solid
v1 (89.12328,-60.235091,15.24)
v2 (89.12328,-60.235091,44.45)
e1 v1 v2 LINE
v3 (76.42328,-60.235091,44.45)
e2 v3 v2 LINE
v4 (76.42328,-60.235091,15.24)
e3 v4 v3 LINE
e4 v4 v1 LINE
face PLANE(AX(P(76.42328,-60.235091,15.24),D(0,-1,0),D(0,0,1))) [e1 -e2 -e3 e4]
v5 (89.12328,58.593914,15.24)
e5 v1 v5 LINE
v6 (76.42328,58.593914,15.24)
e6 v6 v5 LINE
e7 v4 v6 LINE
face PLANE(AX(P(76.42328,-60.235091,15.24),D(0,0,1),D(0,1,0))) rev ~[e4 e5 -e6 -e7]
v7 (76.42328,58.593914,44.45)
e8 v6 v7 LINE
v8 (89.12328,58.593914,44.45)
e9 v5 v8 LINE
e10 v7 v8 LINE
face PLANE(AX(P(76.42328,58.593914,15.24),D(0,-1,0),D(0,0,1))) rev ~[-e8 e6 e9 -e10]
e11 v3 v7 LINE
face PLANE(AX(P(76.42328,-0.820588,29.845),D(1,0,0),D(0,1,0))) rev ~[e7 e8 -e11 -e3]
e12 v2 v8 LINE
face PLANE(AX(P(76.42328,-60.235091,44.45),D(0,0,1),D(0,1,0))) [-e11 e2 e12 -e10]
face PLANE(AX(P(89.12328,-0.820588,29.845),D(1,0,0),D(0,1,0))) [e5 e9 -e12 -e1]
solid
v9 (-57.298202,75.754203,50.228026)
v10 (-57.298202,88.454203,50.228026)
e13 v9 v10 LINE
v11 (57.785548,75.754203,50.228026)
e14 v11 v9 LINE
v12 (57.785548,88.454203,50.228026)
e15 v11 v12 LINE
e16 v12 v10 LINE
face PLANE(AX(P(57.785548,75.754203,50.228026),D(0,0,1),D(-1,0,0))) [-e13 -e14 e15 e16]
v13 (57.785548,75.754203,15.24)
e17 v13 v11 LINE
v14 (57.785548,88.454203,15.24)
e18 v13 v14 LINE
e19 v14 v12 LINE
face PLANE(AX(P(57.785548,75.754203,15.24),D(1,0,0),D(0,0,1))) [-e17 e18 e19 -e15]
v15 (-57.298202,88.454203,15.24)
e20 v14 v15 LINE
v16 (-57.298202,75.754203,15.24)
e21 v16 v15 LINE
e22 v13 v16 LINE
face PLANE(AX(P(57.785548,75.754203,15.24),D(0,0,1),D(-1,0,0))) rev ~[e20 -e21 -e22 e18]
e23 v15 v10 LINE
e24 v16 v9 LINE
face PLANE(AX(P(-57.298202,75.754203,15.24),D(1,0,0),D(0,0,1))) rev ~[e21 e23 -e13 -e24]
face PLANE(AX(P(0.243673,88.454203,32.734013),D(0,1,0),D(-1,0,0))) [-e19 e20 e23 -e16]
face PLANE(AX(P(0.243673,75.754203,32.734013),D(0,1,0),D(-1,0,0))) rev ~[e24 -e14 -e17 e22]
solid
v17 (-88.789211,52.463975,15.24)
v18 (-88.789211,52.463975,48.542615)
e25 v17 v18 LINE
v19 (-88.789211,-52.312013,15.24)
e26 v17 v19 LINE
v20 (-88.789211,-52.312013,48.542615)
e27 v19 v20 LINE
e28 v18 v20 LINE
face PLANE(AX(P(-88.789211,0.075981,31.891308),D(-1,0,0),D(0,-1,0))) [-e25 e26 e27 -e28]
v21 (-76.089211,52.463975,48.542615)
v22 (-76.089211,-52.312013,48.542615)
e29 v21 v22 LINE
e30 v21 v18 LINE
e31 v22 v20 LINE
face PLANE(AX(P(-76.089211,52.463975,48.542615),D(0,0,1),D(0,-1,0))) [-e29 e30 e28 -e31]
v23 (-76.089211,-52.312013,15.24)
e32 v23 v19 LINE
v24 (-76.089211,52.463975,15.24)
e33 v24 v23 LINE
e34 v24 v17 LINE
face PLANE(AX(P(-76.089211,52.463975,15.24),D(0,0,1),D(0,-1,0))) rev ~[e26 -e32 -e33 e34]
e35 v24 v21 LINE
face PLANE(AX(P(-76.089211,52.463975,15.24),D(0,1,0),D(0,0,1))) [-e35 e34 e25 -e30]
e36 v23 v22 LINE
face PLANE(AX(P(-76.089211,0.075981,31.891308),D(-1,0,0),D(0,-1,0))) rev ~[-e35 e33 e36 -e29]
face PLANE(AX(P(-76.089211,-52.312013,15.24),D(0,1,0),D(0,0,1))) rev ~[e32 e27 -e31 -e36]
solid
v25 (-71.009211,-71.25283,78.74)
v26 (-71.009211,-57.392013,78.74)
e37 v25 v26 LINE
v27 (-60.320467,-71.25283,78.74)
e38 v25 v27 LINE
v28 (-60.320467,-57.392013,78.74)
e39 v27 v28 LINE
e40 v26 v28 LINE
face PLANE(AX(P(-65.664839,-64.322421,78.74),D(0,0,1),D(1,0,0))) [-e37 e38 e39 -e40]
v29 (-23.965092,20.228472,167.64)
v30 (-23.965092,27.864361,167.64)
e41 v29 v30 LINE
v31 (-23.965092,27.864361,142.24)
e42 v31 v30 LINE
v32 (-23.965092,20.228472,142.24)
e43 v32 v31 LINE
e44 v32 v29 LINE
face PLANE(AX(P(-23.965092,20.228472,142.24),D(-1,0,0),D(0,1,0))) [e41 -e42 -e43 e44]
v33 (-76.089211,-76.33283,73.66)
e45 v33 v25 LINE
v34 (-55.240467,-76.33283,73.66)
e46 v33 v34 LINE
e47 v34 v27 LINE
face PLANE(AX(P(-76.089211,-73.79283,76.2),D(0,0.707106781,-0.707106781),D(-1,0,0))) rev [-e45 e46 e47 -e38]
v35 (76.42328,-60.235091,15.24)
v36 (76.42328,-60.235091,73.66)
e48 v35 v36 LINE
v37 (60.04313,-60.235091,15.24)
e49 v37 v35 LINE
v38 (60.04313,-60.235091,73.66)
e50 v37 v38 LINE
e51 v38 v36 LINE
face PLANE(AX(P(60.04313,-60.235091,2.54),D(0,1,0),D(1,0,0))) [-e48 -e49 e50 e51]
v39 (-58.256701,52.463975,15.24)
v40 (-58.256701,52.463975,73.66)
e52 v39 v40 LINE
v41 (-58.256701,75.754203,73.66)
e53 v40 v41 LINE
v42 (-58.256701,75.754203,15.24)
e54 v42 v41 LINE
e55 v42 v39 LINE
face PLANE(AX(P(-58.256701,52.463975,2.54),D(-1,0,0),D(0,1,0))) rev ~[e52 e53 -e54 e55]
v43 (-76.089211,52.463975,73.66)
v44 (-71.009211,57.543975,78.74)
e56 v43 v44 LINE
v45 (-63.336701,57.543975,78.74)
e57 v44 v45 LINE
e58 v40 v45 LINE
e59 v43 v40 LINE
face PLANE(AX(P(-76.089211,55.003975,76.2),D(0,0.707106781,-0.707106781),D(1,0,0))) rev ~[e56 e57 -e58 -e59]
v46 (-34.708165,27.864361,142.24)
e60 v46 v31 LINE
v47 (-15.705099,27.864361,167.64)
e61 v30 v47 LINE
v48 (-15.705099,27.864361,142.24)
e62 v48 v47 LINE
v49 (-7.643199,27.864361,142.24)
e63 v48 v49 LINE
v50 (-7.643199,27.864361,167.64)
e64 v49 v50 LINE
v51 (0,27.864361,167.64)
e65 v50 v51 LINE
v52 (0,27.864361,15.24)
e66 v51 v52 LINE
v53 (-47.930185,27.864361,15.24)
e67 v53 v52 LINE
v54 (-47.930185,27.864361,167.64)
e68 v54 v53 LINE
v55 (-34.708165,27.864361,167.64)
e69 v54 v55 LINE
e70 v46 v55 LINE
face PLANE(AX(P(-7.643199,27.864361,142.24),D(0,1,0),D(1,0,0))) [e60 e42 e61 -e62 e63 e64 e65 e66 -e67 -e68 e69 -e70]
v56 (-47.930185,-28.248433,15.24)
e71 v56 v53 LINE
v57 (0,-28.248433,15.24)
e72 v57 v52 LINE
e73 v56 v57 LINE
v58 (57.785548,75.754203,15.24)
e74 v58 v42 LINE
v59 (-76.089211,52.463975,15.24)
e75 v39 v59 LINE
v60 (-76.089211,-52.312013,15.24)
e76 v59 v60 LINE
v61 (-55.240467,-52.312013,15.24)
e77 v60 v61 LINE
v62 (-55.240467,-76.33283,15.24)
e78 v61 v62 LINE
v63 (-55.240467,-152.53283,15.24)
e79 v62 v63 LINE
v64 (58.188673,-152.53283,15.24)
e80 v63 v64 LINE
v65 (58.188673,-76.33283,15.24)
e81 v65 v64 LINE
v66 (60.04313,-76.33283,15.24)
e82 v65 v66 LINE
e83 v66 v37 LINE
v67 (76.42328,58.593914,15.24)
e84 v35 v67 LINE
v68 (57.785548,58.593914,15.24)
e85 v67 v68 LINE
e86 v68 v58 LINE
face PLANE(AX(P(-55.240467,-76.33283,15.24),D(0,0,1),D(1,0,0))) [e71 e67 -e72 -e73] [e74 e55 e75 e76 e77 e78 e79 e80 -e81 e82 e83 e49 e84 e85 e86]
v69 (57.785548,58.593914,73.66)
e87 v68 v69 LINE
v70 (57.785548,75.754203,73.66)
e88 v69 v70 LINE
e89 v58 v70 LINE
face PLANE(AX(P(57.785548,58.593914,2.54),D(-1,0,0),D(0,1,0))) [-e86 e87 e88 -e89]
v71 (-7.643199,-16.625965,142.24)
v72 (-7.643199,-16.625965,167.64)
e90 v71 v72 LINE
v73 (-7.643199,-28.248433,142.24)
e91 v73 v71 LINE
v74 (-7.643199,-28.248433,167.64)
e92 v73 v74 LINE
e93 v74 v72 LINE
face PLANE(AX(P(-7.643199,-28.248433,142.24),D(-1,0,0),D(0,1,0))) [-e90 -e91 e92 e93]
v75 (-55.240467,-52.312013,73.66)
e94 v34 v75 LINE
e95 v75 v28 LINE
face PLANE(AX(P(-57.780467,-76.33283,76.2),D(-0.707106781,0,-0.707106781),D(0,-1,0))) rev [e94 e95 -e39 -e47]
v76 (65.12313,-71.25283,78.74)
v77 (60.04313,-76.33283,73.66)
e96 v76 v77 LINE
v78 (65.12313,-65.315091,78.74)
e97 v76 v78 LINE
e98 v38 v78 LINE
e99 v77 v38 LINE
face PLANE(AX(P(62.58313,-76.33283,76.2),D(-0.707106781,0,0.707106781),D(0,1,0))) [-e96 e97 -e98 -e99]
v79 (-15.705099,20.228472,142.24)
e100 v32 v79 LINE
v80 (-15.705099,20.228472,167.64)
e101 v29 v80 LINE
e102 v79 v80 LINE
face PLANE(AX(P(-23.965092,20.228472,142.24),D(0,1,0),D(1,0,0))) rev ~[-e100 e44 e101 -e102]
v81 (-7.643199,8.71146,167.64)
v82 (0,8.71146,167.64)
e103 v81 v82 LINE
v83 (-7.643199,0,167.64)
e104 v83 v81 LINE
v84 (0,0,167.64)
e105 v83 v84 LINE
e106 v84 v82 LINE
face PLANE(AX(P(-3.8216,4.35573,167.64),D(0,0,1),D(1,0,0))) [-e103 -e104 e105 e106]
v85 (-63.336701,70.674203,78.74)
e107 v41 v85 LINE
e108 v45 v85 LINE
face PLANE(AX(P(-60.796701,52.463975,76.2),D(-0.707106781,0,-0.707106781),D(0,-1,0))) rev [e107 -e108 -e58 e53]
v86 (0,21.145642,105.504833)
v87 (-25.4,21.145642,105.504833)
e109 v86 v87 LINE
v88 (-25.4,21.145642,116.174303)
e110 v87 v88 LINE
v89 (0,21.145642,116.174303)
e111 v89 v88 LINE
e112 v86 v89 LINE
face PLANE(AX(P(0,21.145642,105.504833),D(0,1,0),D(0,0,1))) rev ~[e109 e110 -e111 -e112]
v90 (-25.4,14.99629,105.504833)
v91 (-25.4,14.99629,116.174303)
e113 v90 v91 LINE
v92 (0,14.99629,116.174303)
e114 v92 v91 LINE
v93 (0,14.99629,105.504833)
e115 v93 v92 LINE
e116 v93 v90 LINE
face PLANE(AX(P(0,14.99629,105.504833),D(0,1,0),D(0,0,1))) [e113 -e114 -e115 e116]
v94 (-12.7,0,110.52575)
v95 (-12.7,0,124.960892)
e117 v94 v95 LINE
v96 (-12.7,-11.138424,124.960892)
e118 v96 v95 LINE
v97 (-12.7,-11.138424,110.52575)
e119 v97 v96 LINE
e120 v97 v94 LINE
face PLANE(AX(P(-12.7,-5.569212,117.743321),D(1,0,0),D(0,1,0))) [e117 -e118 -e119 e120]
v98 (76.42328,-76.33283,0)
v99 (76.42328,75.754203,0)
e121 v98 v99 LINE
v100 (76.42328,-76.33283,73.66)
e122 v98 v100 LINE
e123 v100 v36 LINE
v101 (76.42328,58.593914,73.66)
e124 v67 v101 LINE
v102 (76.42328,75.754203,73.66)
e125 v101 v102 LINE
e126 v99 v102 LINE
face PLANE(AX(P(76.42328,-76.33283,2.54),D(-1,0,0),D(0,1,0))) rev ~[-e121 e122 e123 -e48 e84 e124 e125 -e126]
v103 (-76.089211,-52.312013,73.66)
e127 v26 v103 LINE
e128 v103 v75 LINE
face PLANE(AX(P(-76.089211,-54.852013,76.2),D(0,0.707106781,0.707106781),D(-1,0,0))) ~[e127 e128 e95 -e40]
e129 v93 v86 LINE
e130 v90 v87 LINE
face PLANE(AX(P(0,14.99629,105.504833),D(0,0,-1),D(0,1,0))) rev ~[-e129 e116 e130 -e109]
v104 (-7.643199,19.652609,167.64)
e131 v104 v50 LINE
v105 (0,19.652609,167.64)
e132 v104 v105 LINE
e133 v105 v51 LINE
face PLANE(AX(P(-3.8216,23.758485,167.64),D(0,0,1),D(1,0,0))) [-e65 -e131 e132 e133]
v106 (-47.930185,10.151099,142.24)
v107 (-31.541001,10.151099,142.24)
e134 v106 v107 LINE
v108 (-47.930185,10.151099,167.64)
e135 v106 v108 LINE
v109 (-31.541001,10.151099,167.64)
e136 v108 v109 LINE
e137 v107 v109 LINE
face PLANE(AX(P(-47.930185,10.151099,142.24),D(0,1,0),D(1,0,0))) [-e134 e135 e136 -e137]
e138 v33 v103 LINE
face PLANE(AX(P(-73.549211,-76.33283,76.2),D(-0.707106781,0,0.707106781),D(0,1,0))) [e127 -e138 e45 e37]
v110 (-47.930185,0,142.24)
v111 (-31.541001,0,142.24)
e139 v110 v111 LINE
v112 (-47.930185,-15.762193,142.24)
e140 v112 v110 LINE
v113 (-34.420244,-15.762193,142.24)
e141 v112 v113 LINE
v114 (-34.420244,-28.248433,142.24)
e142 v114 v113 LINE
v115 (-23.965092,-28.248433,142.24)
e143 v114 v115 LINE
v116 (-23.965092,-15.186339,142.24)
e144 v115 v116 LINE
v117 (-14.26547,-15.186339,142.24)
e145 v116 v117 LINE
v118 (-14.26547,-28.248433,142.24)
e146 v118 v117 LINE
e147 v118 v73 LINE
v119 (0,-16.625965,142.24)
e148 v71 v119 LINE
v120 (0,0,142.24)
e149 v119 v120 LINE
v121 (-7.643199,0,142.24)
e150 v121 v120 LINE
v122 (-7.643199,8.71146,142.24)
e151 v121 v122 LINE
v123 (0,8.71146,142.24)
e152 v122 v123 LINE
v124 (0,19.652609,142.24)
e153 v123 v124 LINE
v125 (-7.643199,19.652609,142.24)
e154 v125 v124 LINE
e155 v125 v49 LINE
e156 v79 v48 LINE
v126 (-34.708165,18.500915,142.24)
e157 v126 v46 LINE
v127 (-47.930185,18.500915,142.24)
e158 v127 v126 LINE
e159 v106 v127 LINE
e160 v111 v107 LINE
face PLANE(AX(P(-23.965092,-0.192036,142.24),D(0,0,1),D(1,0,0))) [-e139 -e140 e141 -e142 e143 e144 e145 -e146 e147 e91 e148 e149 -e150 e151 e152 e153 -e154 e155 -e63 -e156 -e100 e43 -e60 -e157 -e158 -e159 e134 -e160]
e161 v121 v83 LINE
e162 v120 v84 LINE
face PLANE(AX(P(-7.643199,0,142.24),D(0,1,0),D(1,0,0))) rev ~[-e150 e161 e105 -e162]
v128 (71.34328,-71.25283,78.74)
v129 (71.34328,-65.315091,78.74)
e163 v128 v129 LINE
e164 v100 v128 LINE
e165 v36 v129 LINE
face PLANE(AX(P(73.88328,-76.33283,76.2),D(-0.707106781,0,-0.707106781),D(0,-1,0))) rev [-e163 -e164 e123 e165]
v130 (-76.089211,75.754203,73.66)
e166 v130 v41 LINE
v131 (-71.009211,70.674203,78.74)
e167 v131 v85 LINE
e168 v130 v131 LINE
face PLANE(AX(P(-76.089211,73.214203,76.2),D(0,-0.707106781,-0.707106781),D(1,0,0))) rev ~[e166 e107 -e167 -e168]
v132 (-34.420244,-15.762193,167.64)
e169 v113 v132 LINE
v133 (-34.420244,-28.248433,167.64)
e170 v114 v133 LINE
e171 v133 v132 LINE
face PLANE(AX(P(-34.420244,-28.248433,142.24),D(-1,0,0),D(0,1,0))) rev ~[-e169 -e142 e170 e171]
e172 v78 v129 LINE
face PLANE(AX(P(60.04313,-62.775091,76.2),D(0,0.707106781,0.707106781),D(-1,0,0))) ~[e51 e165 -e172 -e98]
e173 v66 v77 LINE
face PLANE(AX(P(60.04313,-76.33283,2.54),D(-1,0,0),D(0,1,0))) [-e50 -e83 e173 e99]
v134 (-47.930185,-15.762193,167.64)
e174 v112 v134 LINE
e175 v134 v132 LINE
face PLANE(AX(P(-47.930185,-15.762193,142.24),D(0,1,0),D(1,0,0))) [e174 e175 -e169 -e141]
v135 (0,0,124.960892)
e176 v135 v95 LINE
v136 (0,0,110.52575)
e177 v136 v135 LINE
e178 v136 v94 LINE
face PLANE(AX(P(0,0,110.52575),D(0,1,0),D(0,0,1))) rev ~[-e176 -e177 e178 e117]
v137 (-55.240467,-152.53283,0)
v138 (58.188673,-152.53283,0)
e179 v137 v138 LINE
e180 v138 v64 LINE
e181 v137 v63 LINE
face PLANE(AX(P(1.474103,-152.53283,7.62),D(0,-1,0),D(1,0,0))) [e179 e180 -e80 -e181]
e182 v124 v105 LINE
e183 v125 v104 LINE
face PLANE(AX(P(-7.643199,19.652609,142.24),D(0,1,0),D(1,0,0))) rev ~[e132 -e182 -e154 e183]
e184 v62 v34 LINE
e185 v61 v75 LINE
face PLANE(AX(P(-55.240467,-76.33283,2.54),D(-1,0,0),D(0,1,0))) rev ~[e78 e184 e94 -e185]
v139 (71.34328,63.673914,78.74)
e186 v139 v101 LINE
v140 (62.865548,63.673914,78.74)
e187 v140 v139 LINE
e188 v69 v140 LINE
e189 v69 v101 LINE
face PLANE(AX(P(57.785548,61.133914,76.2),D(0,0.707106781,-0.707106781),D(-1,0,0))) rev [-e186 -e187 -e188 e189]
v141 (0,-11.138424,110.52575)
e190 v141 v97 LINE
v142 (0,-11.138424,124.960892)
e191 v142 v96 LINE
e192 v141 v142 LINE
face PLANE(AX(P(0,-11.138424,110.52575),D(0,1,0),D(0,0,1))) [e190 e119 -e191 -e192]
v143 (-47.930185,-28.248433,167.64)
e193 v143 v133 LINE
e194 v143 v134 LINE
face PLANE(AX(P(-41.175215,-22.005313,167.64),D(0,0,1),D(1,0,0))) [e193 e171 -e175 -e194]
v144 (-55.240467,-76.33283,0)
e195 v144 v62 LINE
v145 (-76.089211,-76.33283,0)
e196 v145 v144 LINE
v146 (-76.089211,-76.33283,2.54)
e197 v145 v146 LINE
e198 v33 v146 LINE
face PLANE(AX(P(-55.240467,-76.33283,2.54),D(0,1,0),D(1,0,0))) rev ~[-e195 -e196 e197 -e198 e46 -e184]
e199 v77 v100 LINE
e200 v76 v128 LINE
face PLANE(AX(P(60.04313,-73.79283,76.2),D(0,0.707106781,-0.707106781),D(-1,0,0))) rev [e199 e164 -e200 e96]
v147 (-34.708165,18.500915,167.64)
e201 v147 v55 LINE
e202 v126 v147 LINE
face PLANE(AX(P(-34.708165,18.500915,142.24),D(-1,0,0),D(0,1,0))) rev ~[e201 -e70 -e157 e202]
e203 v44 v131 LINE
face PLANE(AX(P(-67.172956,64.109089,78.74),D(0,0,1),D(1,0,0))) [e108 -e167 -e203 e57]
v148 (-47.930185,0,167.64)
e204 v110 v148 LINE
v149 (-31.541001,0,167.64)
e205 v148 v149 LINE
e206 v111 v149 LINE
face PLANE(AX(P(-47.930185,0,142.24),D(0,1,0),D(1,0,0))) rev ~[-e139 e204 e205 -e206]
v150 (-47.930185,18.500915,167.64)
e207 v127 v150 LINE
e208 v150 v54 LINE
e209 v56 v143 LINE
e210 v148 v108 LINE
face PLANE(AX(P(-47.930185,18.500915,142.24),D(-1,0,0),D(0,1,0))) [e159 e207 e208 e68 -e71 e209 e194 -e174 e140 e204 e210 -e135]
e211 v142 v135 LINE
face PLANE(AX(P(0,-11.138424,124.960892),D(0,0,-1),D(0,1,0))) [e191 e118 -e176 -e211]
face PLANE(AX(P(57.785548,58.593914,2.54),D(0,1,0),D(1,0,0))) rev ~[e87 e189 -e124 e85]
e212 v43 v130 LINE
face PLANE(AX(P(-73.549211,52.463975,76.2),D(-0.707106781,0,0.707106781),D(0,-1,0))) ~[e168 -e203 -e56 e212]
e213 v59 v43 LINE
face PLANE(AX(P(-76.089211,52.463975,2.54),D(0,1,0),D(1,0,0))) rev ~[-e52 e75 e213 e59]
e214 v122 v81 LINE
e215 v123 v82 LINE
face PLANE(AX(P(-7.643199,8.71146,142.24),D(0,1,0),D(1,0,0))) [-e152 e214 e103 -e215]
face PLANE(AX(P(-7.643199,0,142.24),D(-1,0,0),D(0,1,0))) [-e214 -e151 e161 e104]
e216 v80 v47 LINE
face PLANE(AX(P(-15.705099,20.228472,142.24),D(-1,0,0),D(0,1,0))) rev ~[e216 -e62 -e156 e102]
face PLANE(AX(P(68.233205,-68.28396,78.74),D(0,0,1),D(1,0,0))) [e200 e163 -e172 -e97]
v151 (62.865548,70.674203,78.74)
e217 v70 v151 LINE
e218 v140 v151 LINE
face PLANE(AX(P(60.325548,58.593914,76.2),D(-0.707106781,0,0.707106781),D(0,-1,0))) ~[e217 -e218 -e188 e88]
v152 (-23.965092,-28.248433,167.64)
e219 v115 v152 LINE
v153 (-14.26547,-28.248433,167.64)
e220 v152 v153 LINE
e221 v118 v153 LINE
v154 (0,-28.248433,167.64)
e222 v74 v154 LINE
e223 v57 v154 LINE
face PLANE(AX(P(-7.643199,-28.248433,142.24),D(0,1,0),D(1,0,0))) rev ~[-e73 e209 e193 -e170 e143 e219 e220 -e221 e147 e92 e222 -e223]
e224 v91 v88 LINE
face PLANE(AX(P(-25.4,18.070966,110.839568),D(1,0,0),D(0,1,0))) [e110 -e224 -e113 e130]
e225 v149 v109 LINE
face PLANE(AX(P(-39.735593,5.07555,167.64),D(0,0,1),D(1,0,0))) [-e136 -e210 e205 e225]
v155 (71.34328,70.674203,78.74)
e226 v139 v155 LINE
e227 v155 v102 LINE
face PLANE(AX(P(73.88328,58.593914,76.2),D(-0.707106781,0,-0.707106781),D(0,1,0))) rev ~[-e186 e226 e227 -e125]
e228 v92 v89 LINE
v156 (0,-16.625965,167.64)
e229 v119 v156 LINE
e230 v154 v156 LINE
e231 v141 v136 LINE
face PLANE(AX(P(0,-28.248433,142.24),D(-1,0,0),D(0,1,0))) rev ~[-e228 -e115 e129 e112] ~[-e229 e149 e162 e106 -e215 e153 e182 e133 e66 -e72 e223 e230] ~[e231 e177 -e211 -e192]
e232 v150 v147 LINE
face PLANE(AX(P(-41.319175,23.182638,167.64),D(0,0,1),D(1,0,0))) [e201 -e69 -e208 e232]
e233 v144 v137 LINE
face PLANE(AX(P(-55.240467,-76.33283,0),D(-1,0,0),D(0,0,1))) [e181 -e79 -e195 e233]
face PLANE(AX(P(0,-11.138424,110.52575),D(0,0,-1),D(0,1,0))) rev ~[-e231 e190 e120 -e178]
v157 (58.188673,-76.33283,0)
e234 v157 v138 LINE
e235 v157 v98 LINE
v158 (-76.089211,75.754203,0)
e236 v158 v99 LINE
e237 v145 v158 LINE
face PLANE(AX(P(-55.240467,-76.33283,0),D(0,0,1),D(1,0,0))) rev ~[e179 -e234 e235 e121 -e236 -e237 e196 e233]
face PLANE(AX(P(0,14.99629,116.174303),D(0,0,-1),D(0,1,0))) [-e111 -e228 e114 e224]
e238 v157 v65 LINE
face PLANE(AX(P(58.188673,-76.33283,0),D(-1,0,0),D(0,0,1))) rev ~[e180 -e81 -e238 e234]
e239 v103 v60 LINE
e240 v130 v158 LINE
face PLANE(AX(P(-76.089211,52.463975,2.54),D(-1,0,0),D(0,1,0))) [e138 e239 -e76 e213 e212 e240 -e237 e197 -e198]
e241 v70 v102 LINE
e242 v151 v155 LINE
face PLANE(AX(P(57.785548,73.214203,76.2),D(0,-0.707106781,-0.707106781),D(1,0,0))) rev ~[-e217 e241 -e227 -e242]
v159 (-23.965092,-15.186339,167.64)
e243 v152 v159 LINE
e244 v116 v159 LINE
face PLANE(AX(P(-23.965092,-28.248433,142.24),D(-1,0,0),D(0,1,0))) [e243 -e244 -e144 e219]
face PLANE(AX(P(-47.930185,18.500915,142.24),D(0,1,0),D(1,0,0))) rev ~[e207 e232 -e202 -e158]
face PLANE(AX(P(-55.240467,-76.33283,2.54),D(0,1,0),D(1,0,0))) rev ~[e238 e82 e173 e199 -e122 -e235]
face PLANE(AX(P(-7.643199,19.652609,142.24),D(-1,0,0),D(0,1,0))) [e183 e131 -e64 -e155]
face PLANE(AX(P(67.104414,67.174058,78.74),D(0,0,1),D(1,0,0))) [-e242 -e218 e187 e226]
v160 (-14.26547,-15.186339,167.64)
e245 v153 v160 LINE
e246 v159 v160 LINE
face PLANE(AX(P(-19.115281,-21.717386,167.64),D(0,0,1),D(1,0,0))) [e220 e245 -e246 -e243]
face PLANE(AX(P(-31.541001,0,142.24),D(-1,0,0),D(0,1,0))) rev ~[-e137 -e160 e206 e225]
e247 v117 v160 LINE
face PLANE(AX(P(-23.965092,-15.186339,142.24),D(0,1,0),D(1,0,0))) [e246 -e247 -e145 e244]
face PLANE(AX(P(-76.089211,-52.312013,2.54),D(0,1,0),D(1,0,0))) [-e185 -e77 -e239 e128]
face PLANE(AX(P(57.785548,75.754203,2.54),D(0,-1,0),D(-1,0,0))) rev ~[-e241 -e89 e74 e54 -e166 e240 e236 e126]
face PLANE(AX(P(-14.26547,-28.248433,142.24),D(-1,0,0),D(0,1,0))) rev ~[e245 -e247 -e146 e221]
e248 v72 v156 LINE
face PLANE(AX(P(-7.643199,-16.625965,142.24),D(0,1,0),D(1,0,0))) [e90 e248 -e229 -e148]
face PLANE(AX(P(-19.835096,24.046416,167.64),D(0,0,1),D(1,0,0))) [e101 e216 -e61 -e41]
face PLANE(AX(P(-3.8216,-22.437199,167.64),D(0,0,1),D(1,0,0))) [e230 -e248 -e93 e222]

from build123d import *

# Parameters (mm, degrees)
F0_W      = 152.5124907494
F0_H      = 152.087032795
F1_DEPTH  = 2.54
F2_W      = 20.8487436175
F2_H      = 24.0208171308
F3_DEPTH  = 76.2
F2_W_2    = 17.8325101733
F2_H_2    = 23.2902280986
F4_DEPTH  = 76.2
F2_W_3    = 16.3801498711
F2_H_3    = 16.0977393389
F2_W_4    = 18.6377316713
F2_H_4    = 17.1602889895
F5_DEPTH  = 76.2
F6_DEPTH  = 12.7
F6_FACE_W = 20.8487436175
F6_FACE_H = 24.0208171308
F7_DEPTH  = 12.7
F8_SIZE   = 5.08
F12_W     = 118.8290044665
F12_H     = 29.21
F13_DEPTH = 12.7
F15_W     = 115.0837503374
F15_H     = 34.9880257642
F16_DEPTH = 12.7
F17_W     = 104.7759875655
F17_H     = 33.3026150262
F18_DEPTH = 12.7
F19_W     = 113.4291402996
F19_H     = 15.24
F20_DEPTH = 76.2
F22_W     = 47.9301847517
F22_H     = 56.1127942055
F23_DEPTH = 127
F24_W     = 13.509940356
F24_H     = 12.4862398952
F25_DEPTH = 25.4
F24_W_2   = 16.3891837001
F24_H_2   = 10.1510994136
F26_DEPTH = 25.4
F24_W_3   = 13.2220201194
F24_H_3   = 9.3634463847
F27_DEPTH = 25.4
F24_W_4   = 8.2599930465
F24_H_4   = 7.6358895749
F28_DEPTH = 25.4
F24_W_5   = 7.6431990601
F24_H_5   = 8.2117523998
F29_DEPTH = 25.4
F24_H_6   = 8.7114600465
F30_DEPTH = 25.4
F24_H_7   = 11.6224680096
F31_DEPTH = 25.4
F24_W_6   = 9.6996221691
F24_H_8   = 13.0620943382
F32_DEPTH = 25.4
F33_W     = 11.1384242773
F33_H     = 14.4351422787
F34_DEPTH = 12.7
F33_W_2   = 6.1493515968
F33_H_2   = 10.6694698334
F35_DEPTH = 25.4


# Not quite as in the source:
# - two fillets or chamfers of one size are made in one step
# - the program builds the solid bodies; features that only make, move or delete a surface that nothing else refers to are left out


with BuildPart() as f1:
    # F0 (on Top) → F1 (new body)
    with BuildSketch(Plane.XY):
        with Locations((0.1670345664, -0.2893134952)):
            Rectangle(F0_W, F0_H)
    extrude(amount=F1_DEPTH)

    # F2 (on face) → F3 (join)
    with BuildSketch(Plane.XY.offset(2.54)):
        with Locations((-65.6648389995, -64.3224213272)):
            Rectangle(F2_W, F2_H)
    extrude(amount=F3_DEPTH)

    # F2 (on face) → F4 (join)
    with BuildSketch(Plane.XY.offset(2.54)):
        with Locations((-67.1729557216, 64.109088853)):
            Rectangle(F2_W_2, F2_H_2)
    extrude(amount=F4_DEPTH)

    # F2 (on face) → F5 (join)
    with BuildSketch(Plane.XY.offset(2.54)):
        with Locations((68.2332050055, -68.2839602232)):
            Rectangle(F2_W_3, F2_H_3)
        with Locations((67.1044141054, 67.1740584075)):
            Rectangle(F2_W_4, F2_H_4)
    extrude(amount=F5_DEPTH)

    # F6 (cut): a face of the model
    f6_faces = [f1.faces().sort_by_distance(p)[0] for p in [
        (-65.6648389995, -64.3224213272, 78.74),
    ]]
    extrude(f6_faces, amount=-F6_DEPTH, mode=Mode.SUBTRACT)

    # F2 (on face) + F6_face (on face) → F7 (join)
    with BuildSketch(Plane.XY.offset(2.54)):
        Polygon((-55.2404671907, -52.3120127618), (-55.2404671907, -76.3328298926), (60.04313007, -76.3328298926), (60.04313007, -60.2350905538), (76.4232799411, -60.2350905538), (76.4232799411, 58.5939139128), (57.7855482697, 58.5939139128), (57.7855482697, 75.7542029023), (-58.256700635, 75.7542029023), (-58.256700635, 52.4639748037), (-76.0892108083, 52.4639748037), (-76.0892108083, -52.3120127618), align=None)
    with BuildSketch(Plane(origin=(-65.6648389995, -64.3224213272, 66.04), x_dir=(1, 0, 0), z_dir=(0, 0, 1))):
        Rectangle(F6_FACE_W, F6_FACE_H)
    extrude(amount=F7_DEPTH)

    # F8
    f8_edges = [f1.edges().sort_by_distance(p)[0] for p in [
        (-65.664839, -76.33283, 78.74),
        (-76.089211, -64.322421, 78.74),
        (-76.089211, 64.109089, 78.74),
        (76.42328, -68.28396, 78.74),
        (76.42328, 67.174058, 78.74),
        (67.104414, 58.593914, 78.74),
        (67.104414, 75.754203, 78.74),
        (57.785548, 67.174058, 78.74),
        (68.233205, -60.235091, 78.74),
        (60.04313, -68.28396, 78.74),
        (68.233205, -76.33283, 78.74),
        (-55.240467, -64.322421, 78.74),
        (-65.664839, -52.312013, 78.74),
        (-58.256701, 64.109089, 78.74),
        (-67.172956, 52.463975, 78.74),
        (-67.172956, 75.754203, 78.74),
    ]]
    chamfer(f8_edges, length=F8_SIZE)

    # F19 (on face) → F20 (join)
    with BuildSketch(Plane.XZ.offset(76.3328298926)):
        with Locations((1.474102959, 7.62)):
            Rectangle(F19_W, F19_H)
    extrude(amount=F20_DEPTH)

    # F22 (on face) → F23 (join)
    with BuildSketch(Plane.XY.offset(15.24)):
        with Locations((-23.9650923759, -0.1920359209)):
            Rectangle(F22_W, F22_H)
    extrude(amount=F23_DEPTH)

    # F24 (on face) → F25 (join)
    with BuildSketch(Plane.XY.offset(142.24)):
        with Locations((-41.1752145737, -22.0053130761)):
            Rectangle(F24_W, F24_H)
    extrude(amount=F25_DEPTH)

    # F24 (on face) → F26 (join)
    with BuildSketch(Plane.XY.offset(142.24)):
        with Locations((-39.7355929017, 5.0755497068)):
            Rectangle(F24_W_2, F24_H_2)
    extrude(amount=F26_DEPTH)

    # F24 (on face) → F27 (join)
    with BuildSketch(Plane.XY.offset(142.24)):
        with Locations((-41.319174692, 23.1826379895)):
            Rectangle(F24_W_3, F24_H_3)
    extrude(amount=F27_DEPTH)

    # F24 (on face) → F28 (join)
    with BuildSketch(Plane.XY.offset(142.24)):
        with Locations((-19.8350958526, 24.0464163944)):
            Rectangle(F24_W_4, F24_H_4)
    extrude(amount=F28_DEPTH)

    # F24 (on face) → F29 (join)
    with BuildSketch(Plane.XY.offset(142.24)):
        with Locations((-3.8215995301, 23.758484982)):
            Rectangle(F24_W_5, F24_H_5)
    extrude(amount=F29_DEPTH)

    # F24 (on face) → F30 (join)
    with BuildSketch(Plane.XY.offset(142.24)):
        with Locations((-3.8215995301, 4.3557300232)):
            Rectangle(F24_W_5, F24_H_6)
    extrude(amount=F30_DEPTH)

    # F24 (on face) → F31 (join)
    with BuildSketch(Plane.XY.offset(142.24)):
        with Locations((-3.8215995301, -22.4371990189)):
            Rectangle(F24_W_5, F24_H_7)
    extrude(amount=F31_DEPTH)

    # F24 (on face) → F32 (join)
    with BuildSketch(Plane.XY.offset(142.24)):
        with Locations((-19.1152812913, -21.7173858546)):
            Rectangle(F24_W_6, F24_H_8)
    extrude(amount=F32_DEPTH)

    # F33 (on face) → F34 (cut)
    with BuildSketch(Plane.YZ):
        with Locations((-5.5692121387, 117.7433207631)):
            Rectangle(F33_W, F33_H)
    extrude(amount=-F34_DEPTH, mode=Mode.SUBTRACT)

    # F33 (on face) → F35 (cut)
    with BuildSketch(Plane.YZ):
        with Locations((18.0709660053, 110.8395680785)):
            Rectangle(F33_W_2, F33_H_2)
    extrude(amount=-F35_DEPTH, mode=Mode.SUBTRACT)


with BuildPart() as f13:
    # F12 (on face) → F13 (new body)
    with BuildSketch(Plane.YZ.offset(76.4232799411)):
        with Locations((-0.8205883205, 29.845)):
            Rectangle(F12_W, F12_H)
    extrude(amount=F13_DEPTH)


with BuildPart() as f16:
    # F15 (on face) → F16 (new body)
    with BuildSketch(Plane(origin=(0, 75.7542029023, 0), x_dir=(-1, 0, 0), z_dir=(0, 1, 0))):
        with Locations((-0.2436731011, 32.7340128821)):
            Rectangle(F15_W, F15_H)
    extrude(amount=F16_DEPTH)


with BuildPart() as f18:
    # F17 (on face) → F18 (new body)
    with BuildSketch(Plane(origin=(-76.0892108083, 0, 0), x_dir=(0, -1, 0), z_dir=(-1, 0, 0))):
        with Locations((-0.0759810209, 31.8913075131)):
            Rectangle(F17_W, F17_H)
    extrude(amount=F18_DEPTH)


solid = Compound([f1.part, f13.part, f16.part, f18.part])
